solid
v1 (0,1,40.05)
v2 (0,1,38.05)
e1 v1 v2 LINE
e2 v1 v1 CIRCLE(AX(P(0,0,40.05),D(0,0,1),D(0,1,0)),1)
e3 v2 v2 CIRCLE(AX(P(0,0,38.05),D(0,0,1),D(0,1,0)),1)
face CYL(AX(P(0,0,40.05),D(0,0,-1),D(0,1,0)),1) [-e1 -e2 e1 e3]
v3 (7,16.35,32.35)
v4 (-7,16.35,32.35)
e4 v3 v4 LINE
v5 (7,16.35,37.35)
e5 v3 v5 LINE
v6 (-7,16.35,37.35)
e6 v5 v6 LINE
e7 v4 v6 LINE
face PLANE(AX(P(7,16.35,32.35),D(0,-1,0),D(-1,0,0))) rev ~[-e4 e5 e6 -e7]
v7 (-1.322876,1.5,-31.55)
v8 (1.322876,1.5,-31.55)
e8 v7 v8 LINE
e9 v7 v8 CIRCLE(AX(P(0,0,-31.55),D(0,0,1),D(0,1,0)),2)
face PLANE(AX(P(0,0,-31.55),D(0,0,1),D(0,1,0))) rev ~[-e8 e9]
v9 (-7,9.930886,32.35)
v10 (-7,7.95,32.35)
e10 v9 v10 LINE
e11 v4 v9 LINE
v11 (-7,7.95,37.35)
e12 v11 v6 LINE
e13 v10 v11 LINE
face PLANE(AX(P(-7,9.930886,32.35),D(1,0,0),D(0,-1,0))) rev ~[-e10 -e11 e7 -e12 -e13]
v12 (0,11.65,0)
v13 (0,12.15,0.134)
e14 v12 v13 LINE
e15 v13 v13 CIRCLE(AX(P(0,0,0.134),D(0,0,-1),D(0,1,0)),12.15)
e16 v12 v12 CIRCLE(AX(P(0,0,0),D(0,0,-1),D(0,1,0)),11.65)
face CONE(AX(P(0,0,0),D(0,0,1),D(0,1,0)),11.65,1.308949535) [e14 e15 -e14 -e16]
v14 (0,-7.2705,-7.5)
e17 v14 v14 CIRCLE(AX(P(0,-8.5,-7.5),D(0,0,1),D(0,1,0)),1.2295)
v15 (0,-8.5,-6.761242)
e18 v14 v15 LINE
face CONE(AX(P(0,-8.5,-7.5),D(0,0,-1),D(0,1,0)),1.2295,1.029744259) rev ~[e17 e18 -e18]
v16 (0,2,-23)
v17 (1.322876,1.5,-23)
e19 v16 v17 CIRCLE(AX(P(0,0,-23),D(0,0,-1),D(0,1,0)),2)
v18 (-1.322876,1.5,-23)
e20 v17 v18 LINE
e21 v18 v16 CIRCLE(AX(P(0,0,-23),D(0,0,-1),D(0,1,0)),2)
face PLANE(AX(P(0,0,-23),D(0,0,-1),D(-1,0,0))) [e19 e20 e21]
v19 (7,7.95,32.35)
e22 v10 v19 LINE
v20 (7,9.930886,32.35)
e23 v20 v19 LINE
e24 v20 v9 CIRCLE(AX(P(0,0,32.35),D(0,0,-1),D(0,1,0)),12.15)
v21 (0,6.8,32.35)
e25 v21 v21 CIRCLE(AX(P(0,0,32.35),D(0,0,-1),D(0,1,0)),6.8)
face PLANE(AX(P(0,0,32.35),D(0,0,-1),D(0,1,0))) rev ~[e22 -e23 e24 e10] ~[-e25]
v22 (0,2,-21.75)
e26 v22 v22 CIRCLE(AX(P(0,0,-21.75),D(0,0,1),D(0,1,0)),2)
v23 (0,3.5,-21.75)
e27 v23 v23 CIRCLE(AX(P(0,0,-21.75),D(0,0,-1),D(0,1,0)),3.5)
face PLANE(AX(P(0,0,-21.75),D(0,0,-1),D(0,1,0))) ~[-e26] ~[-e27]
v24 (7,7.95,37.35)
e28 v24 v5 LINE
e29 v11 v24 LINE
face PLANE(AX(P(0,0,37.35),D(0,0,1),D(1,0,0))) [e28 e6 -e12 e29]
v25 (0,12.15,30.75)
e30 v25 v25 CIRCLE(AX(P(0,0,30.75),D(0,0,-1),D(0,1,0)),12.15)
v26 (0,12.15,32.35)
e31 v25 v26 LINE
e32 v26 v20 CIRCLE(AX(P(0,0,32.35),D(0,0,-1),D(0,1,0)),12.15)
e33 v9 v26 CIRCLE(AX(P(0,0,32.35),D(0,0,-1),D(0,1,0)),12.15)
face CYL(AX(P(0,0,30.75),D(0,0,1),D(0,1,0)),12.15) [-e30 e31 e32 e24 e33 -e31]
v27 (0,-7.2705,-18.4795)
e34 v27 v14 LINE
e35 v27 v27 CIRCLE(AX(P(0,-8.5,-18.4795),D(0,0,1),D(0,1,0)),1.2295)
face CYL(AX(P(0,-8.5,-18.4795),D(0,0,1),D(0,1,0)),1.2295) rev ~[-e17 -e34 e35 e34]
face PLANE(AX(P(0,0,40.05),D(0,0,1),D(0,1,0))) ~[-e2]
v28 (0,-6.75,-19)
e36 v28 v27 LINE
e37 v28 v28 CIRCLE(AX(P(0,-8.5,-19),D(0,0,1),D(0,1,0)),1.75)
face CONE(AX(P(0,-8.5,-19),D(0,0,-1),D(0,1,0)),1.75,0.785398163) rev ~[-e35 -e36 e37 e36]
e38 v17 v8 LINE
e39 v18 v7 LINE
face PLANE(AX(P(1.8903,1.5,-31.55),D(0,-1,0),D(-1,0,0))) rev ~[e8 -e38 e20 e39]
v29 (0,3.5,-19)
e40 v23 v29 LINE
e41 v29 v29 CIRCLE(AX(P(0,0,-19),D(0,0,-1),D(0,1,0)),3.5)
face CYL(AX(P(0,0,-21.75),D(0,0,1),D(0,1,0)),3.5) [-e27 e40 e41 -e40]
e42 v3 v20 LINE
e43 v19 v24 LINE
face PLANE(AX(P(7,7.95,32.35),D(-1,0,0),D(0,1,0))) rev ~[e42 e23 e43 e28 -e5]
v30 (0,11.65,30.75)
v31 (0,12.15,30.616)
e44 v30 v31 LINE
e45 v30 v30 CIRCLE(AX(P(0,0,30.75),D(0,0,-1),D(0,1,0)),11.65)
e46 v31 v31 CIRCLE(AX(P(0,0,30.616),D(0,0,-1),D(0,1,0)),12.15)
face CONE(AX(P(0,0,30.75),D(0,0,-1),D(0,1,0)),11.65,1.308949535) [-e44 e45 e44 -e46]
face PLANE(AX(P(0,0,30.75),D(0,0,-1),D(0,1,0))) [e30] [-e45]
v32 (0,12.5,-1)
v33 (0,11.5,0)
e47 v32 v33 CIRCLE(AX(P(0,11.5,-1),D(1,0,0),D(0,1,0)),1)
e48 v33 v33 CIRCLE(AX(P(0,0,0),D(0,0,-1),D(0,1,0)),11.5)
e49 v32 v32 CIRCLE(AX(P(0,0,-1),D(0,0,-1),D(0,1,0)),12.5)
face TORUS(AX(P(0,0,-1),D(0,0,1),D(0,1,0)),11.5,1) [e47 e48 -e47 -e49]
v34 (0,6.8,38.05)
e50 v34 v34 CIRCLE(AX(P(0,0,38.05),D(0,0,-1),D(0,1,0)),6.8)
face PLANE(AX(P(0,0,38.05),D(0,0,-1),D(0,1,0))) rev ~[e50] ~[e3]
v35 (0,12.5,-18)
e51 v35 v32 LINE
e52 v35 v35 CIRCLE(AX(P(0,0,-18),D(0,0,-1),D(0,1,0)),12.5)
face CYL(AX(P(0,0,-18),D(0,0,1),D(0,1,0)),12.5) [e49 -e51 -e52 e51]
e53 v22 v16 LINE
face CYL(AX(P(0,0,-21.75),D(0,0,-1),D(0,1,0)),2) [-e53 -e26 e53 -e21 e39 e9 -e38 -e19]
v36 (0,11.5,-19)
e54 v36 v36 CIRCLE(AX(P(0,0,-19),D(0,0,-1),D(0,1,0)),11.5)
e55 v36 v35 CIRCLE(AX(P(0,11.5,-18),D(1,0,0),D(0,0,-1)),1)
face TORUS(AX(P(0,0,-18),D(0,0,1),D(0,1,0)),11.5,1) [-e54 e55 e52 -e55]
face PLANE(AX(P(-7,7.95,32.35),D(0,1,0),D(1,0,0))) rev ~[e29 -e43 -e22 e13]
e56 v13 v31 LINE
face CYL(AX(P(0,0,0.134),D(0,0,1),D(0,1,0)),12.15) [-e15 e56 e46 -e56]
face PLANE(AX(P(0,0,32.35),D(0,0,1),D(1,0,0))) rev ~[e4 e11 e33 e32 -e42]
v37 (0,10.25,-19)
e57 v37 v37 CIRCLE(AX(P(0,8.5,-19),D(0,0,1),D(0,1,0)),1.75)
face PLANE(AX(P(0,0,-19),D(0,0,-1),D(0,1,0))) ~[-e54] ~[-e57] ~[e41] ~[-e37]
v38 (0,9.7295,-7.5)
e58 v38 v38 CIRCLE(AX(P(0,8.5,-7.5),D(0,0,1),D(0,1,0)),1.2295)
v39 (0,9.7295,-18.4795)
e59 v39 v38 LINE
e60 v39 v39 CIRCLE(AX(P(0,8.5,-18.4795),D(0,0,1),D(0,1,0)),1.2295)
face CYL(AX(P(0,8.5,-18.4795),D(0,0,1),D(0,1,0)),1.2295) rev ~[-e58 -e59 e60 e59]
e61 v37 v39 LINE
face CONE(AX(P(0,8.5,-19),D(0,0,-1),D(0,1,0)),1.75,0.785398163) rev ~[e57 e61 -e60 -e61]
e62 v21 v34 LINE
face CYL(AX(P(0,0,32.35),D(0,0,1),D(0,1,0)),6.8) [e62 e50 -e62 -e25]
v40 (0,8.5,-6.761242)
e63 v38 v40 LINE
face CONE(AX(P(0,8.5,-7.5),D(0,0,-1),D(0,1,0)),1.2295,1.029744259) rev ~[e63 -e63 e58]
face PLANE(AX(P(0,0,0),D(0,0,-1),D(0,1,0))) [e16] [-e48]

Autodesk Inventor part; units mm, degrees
ref_plane "YZ Plane" through (0, 0, 0) normal (1, 0, 0) x (0, 1, 0)
ref_plane "XZ Plane" through (0, 0, 0) normal (0, 1, 0) x (-1, 0, 0)
ref_plane "XY Plane" through (0, 0, 0) normal (0, 0, 1) x (1, 0, 0)
sketch "Эскиз1" plane through (0, 0, 0) normal (1, 0, 0) x (0, 1, 0)
  line L0 (0, 0) -> (11.15, 0)
  line L1 (12.15, 0.134) -> (12.15, 30.616)
  line L2 (12.15, 30.75) -> (11.65, 30.75)
  line L3 (11.65, 30.75) -> (12.15, 30.616)
  line L4 (11.65, 30.75) -> (12.7154, 30.75) construction
  line L5 (12.15, 30.75) -> (12.15, 32.35)
  line L6 (12.15, 32.35) -> (0, 32.35)
  line L7 (11.65, 30.75) -> (0, 30.75)
  line L8 (0, 32.35) -> (0, 0)
  line L9 (12.15, 0) -> (11.65, 0)
  line L10 (11.65, 0) -> (12.15, 0.134)
  line L11 (0, 32.35) -> (6.8, 32.35)
  line L12 (6.8, 32.35) -> (6.8, 38.05)
  line L13 (6.8, 38.05) -> (0, 38.05)
  line L14 (0, 38.05) -> (0, 32.35)
  line L15 (0, 38.05) -> (0, 40.05)
  line L16 (0, 40.05) -> (1, 40.05)
  line L17 (1, 40.05) -> (1, 38.05)
  line L18 (11.65, 0) -> (12.15, 0)
  line L19 (0, 0) -> (0, -19)
  line L20 (0, -19) -> (0, -21.75)
  line L21 (0, -21.75) -> (3.5, -21.75)
  line L22 (3.5, -21.75) -> (3.5, -19)
  line L23 (0, -21.75) -> (2, -21.75)
  line L24 (2, -21.75) -> (2, -31.55)
  line L25 (2, -31.55) -> (0, -31.55)
  line L26 (0, -31.55) -> (0, -21.75)
  line L27 (11.65, 0) -> (11.15, 0)
  line L28 (0, -19) -> (11.5, -19)
  line L29 (12.5, -18) -> (12.5, -1)
  line L30 (11.5, 0) -> (11.65, 0)
  arc A0 (12.5, -1) -> (11.5, 0) centre (11.5, -1) ccw
  arc A1 (11.5, -19) -> (12.5, -18) centre (11.5, -18) ccw
  point P0 (12.5, -19)
  dimension "d0" = 12.15
  dimension "d1" = 30.75
  dimension "d2" = 0.5
  dimension "d4" = 15
  dimension "d5" = 1.6
  dimension "d6" = 0.5
  dimension "d7" = 15
  dimension "d8" = 6.8
  dimension "d9" = 5.7
  dimension "d10" = 2
  dimension "d11" = 1
  dimension "d13" = 2.75
  dimension "d14" = 3.5
  dimension "d15" = 2
  dimension "d16" = 9.8
  dimension "d23" = 12.5
  dimension "d24" = 1
revolve "Вращение1" add sketch "Эскиз1" angle 360 about axis through (0, 0, 38.05) along (0, 0, 1) contours L15 L16 L17 L13
revolve "Вращение2" add sketch "Эскиз1" angle 360 about axis through (0, 0, 38.05) along (0, 0, -1) contours L14 L13 L12 L6
revolve "Вращение3" add sketch "Эскиз1" angle 360 about axis through (0, 0, 32.35) along (0, 0, -1) contours L8 L6 L5 L2 L7
revolve "Вращение4" add sketch "Эскиз1" angle 360 about axis through (0, 0, 32.35) along (0, 0, -1) contours L8 L7 L3 L1 L10 L27 L0
revolve "Вращение5" add sketch "Эскиз1" angle 360 about axis through (0, 0, 0) along (0, 0, -1) contours L0 L27 A0 L29 A1 L28 L19
revolve "Вращение6" add sketch "Эскиз1" angle 360 about axis through (0, 0, -19) along (0, 0, -1) contours L28 L22 L21 L20
revolve "Вращение7" add sketch "Эскиз1" angle 360 about axis through (0, 0, -31.55) along (0, 0, 1) contours L21 L24 L25 L26
sketch "Эскиз2" plane through (0, 0, 32.35) normal (0, 0, 1) x (1, 0, 0)
  line L0 (-7, 7.95) -> (7, 7.95)
  line L1 (7, 7.95) -> (7, 16.35)
  line L2 (7, 16.35) -> (-7, 16.35)
  line L3 (-7, 16.35) -> (-7, 7.95)
  line L4 (-7, 7.95) -> (7, 16.35) construction
  line L5 (7, 7.95) -> (-7, 16.35) construction
  circle A0 centre (0, 0) radius 12.15 projected
  point P0 (0, 12.15)
  dimension "d28" = 14
  dimension "d29" = 8.4
extrude "Выдавливание1" add sketch "Эскиз2" along normal blind 5 contours L3 A0 L1 L0 | L3 L2 L1 A0 picked at (-0.4961, 9.3195)
sketch "Эскиз3" plane through (0, 0, -31.55) normal (0, 0, -1) x (-1, 0, 0)
  line L0 (-1.8903, 1.5) -> (1.8903, 1.5)
  line L1 (1.8903, 1.5) -> (1.8903, 3.1362)
  line L2 (1.8903, 3.1362) -> (-1.8903, 3.1362)
  line L3 (-1.8903, 3.1362) -> (-1.8903, 1.5)
  line L4 (-1.8903, 1.5) -> (1.8903, 3.1362) construction
  line L5 (1.8903, 1.5) -> (-1.8903, 3.1362) construction
  circle A0 centre (0, 0) radius 2 projected
  point P0 (0, 2.3181)
  dimension "d32" = 1.5
extrude "Выдавливание2" cut sketch "Эскиз3" against normal blind 8.55 contours L3 L2 L1 L0 A0 | A0 L0 picked at (0, 1.6667)
sketch "Эскиз4" plane through (0, 0, -19) normal (0, 0, -1) x (-1, 0, 0)
  circle A0 centre (0, 0) radius 3.5 projected
  circle A1 centre (0, 0) radius 11.5 projected
  circle A2 centre (0, 8.5) radius 0.4758
  line L0 (-17.5, 0) -> (17.5, 0) projected
  circle A3 centre (0, -8.5) radius 0.4758
  dimension "d35" = 8.5
hole "Отверстие1" at (0, 8.5, -19) at (0, -8.5, -19) direction (0, 0, 1) diameter 2.459 depth 11.5 tip angle 118 countersink diameter 3.5 countersink angle 90 thread size "M3x0.5" class "6H" standard "ISO Metric profile"
properties part number "servo"
